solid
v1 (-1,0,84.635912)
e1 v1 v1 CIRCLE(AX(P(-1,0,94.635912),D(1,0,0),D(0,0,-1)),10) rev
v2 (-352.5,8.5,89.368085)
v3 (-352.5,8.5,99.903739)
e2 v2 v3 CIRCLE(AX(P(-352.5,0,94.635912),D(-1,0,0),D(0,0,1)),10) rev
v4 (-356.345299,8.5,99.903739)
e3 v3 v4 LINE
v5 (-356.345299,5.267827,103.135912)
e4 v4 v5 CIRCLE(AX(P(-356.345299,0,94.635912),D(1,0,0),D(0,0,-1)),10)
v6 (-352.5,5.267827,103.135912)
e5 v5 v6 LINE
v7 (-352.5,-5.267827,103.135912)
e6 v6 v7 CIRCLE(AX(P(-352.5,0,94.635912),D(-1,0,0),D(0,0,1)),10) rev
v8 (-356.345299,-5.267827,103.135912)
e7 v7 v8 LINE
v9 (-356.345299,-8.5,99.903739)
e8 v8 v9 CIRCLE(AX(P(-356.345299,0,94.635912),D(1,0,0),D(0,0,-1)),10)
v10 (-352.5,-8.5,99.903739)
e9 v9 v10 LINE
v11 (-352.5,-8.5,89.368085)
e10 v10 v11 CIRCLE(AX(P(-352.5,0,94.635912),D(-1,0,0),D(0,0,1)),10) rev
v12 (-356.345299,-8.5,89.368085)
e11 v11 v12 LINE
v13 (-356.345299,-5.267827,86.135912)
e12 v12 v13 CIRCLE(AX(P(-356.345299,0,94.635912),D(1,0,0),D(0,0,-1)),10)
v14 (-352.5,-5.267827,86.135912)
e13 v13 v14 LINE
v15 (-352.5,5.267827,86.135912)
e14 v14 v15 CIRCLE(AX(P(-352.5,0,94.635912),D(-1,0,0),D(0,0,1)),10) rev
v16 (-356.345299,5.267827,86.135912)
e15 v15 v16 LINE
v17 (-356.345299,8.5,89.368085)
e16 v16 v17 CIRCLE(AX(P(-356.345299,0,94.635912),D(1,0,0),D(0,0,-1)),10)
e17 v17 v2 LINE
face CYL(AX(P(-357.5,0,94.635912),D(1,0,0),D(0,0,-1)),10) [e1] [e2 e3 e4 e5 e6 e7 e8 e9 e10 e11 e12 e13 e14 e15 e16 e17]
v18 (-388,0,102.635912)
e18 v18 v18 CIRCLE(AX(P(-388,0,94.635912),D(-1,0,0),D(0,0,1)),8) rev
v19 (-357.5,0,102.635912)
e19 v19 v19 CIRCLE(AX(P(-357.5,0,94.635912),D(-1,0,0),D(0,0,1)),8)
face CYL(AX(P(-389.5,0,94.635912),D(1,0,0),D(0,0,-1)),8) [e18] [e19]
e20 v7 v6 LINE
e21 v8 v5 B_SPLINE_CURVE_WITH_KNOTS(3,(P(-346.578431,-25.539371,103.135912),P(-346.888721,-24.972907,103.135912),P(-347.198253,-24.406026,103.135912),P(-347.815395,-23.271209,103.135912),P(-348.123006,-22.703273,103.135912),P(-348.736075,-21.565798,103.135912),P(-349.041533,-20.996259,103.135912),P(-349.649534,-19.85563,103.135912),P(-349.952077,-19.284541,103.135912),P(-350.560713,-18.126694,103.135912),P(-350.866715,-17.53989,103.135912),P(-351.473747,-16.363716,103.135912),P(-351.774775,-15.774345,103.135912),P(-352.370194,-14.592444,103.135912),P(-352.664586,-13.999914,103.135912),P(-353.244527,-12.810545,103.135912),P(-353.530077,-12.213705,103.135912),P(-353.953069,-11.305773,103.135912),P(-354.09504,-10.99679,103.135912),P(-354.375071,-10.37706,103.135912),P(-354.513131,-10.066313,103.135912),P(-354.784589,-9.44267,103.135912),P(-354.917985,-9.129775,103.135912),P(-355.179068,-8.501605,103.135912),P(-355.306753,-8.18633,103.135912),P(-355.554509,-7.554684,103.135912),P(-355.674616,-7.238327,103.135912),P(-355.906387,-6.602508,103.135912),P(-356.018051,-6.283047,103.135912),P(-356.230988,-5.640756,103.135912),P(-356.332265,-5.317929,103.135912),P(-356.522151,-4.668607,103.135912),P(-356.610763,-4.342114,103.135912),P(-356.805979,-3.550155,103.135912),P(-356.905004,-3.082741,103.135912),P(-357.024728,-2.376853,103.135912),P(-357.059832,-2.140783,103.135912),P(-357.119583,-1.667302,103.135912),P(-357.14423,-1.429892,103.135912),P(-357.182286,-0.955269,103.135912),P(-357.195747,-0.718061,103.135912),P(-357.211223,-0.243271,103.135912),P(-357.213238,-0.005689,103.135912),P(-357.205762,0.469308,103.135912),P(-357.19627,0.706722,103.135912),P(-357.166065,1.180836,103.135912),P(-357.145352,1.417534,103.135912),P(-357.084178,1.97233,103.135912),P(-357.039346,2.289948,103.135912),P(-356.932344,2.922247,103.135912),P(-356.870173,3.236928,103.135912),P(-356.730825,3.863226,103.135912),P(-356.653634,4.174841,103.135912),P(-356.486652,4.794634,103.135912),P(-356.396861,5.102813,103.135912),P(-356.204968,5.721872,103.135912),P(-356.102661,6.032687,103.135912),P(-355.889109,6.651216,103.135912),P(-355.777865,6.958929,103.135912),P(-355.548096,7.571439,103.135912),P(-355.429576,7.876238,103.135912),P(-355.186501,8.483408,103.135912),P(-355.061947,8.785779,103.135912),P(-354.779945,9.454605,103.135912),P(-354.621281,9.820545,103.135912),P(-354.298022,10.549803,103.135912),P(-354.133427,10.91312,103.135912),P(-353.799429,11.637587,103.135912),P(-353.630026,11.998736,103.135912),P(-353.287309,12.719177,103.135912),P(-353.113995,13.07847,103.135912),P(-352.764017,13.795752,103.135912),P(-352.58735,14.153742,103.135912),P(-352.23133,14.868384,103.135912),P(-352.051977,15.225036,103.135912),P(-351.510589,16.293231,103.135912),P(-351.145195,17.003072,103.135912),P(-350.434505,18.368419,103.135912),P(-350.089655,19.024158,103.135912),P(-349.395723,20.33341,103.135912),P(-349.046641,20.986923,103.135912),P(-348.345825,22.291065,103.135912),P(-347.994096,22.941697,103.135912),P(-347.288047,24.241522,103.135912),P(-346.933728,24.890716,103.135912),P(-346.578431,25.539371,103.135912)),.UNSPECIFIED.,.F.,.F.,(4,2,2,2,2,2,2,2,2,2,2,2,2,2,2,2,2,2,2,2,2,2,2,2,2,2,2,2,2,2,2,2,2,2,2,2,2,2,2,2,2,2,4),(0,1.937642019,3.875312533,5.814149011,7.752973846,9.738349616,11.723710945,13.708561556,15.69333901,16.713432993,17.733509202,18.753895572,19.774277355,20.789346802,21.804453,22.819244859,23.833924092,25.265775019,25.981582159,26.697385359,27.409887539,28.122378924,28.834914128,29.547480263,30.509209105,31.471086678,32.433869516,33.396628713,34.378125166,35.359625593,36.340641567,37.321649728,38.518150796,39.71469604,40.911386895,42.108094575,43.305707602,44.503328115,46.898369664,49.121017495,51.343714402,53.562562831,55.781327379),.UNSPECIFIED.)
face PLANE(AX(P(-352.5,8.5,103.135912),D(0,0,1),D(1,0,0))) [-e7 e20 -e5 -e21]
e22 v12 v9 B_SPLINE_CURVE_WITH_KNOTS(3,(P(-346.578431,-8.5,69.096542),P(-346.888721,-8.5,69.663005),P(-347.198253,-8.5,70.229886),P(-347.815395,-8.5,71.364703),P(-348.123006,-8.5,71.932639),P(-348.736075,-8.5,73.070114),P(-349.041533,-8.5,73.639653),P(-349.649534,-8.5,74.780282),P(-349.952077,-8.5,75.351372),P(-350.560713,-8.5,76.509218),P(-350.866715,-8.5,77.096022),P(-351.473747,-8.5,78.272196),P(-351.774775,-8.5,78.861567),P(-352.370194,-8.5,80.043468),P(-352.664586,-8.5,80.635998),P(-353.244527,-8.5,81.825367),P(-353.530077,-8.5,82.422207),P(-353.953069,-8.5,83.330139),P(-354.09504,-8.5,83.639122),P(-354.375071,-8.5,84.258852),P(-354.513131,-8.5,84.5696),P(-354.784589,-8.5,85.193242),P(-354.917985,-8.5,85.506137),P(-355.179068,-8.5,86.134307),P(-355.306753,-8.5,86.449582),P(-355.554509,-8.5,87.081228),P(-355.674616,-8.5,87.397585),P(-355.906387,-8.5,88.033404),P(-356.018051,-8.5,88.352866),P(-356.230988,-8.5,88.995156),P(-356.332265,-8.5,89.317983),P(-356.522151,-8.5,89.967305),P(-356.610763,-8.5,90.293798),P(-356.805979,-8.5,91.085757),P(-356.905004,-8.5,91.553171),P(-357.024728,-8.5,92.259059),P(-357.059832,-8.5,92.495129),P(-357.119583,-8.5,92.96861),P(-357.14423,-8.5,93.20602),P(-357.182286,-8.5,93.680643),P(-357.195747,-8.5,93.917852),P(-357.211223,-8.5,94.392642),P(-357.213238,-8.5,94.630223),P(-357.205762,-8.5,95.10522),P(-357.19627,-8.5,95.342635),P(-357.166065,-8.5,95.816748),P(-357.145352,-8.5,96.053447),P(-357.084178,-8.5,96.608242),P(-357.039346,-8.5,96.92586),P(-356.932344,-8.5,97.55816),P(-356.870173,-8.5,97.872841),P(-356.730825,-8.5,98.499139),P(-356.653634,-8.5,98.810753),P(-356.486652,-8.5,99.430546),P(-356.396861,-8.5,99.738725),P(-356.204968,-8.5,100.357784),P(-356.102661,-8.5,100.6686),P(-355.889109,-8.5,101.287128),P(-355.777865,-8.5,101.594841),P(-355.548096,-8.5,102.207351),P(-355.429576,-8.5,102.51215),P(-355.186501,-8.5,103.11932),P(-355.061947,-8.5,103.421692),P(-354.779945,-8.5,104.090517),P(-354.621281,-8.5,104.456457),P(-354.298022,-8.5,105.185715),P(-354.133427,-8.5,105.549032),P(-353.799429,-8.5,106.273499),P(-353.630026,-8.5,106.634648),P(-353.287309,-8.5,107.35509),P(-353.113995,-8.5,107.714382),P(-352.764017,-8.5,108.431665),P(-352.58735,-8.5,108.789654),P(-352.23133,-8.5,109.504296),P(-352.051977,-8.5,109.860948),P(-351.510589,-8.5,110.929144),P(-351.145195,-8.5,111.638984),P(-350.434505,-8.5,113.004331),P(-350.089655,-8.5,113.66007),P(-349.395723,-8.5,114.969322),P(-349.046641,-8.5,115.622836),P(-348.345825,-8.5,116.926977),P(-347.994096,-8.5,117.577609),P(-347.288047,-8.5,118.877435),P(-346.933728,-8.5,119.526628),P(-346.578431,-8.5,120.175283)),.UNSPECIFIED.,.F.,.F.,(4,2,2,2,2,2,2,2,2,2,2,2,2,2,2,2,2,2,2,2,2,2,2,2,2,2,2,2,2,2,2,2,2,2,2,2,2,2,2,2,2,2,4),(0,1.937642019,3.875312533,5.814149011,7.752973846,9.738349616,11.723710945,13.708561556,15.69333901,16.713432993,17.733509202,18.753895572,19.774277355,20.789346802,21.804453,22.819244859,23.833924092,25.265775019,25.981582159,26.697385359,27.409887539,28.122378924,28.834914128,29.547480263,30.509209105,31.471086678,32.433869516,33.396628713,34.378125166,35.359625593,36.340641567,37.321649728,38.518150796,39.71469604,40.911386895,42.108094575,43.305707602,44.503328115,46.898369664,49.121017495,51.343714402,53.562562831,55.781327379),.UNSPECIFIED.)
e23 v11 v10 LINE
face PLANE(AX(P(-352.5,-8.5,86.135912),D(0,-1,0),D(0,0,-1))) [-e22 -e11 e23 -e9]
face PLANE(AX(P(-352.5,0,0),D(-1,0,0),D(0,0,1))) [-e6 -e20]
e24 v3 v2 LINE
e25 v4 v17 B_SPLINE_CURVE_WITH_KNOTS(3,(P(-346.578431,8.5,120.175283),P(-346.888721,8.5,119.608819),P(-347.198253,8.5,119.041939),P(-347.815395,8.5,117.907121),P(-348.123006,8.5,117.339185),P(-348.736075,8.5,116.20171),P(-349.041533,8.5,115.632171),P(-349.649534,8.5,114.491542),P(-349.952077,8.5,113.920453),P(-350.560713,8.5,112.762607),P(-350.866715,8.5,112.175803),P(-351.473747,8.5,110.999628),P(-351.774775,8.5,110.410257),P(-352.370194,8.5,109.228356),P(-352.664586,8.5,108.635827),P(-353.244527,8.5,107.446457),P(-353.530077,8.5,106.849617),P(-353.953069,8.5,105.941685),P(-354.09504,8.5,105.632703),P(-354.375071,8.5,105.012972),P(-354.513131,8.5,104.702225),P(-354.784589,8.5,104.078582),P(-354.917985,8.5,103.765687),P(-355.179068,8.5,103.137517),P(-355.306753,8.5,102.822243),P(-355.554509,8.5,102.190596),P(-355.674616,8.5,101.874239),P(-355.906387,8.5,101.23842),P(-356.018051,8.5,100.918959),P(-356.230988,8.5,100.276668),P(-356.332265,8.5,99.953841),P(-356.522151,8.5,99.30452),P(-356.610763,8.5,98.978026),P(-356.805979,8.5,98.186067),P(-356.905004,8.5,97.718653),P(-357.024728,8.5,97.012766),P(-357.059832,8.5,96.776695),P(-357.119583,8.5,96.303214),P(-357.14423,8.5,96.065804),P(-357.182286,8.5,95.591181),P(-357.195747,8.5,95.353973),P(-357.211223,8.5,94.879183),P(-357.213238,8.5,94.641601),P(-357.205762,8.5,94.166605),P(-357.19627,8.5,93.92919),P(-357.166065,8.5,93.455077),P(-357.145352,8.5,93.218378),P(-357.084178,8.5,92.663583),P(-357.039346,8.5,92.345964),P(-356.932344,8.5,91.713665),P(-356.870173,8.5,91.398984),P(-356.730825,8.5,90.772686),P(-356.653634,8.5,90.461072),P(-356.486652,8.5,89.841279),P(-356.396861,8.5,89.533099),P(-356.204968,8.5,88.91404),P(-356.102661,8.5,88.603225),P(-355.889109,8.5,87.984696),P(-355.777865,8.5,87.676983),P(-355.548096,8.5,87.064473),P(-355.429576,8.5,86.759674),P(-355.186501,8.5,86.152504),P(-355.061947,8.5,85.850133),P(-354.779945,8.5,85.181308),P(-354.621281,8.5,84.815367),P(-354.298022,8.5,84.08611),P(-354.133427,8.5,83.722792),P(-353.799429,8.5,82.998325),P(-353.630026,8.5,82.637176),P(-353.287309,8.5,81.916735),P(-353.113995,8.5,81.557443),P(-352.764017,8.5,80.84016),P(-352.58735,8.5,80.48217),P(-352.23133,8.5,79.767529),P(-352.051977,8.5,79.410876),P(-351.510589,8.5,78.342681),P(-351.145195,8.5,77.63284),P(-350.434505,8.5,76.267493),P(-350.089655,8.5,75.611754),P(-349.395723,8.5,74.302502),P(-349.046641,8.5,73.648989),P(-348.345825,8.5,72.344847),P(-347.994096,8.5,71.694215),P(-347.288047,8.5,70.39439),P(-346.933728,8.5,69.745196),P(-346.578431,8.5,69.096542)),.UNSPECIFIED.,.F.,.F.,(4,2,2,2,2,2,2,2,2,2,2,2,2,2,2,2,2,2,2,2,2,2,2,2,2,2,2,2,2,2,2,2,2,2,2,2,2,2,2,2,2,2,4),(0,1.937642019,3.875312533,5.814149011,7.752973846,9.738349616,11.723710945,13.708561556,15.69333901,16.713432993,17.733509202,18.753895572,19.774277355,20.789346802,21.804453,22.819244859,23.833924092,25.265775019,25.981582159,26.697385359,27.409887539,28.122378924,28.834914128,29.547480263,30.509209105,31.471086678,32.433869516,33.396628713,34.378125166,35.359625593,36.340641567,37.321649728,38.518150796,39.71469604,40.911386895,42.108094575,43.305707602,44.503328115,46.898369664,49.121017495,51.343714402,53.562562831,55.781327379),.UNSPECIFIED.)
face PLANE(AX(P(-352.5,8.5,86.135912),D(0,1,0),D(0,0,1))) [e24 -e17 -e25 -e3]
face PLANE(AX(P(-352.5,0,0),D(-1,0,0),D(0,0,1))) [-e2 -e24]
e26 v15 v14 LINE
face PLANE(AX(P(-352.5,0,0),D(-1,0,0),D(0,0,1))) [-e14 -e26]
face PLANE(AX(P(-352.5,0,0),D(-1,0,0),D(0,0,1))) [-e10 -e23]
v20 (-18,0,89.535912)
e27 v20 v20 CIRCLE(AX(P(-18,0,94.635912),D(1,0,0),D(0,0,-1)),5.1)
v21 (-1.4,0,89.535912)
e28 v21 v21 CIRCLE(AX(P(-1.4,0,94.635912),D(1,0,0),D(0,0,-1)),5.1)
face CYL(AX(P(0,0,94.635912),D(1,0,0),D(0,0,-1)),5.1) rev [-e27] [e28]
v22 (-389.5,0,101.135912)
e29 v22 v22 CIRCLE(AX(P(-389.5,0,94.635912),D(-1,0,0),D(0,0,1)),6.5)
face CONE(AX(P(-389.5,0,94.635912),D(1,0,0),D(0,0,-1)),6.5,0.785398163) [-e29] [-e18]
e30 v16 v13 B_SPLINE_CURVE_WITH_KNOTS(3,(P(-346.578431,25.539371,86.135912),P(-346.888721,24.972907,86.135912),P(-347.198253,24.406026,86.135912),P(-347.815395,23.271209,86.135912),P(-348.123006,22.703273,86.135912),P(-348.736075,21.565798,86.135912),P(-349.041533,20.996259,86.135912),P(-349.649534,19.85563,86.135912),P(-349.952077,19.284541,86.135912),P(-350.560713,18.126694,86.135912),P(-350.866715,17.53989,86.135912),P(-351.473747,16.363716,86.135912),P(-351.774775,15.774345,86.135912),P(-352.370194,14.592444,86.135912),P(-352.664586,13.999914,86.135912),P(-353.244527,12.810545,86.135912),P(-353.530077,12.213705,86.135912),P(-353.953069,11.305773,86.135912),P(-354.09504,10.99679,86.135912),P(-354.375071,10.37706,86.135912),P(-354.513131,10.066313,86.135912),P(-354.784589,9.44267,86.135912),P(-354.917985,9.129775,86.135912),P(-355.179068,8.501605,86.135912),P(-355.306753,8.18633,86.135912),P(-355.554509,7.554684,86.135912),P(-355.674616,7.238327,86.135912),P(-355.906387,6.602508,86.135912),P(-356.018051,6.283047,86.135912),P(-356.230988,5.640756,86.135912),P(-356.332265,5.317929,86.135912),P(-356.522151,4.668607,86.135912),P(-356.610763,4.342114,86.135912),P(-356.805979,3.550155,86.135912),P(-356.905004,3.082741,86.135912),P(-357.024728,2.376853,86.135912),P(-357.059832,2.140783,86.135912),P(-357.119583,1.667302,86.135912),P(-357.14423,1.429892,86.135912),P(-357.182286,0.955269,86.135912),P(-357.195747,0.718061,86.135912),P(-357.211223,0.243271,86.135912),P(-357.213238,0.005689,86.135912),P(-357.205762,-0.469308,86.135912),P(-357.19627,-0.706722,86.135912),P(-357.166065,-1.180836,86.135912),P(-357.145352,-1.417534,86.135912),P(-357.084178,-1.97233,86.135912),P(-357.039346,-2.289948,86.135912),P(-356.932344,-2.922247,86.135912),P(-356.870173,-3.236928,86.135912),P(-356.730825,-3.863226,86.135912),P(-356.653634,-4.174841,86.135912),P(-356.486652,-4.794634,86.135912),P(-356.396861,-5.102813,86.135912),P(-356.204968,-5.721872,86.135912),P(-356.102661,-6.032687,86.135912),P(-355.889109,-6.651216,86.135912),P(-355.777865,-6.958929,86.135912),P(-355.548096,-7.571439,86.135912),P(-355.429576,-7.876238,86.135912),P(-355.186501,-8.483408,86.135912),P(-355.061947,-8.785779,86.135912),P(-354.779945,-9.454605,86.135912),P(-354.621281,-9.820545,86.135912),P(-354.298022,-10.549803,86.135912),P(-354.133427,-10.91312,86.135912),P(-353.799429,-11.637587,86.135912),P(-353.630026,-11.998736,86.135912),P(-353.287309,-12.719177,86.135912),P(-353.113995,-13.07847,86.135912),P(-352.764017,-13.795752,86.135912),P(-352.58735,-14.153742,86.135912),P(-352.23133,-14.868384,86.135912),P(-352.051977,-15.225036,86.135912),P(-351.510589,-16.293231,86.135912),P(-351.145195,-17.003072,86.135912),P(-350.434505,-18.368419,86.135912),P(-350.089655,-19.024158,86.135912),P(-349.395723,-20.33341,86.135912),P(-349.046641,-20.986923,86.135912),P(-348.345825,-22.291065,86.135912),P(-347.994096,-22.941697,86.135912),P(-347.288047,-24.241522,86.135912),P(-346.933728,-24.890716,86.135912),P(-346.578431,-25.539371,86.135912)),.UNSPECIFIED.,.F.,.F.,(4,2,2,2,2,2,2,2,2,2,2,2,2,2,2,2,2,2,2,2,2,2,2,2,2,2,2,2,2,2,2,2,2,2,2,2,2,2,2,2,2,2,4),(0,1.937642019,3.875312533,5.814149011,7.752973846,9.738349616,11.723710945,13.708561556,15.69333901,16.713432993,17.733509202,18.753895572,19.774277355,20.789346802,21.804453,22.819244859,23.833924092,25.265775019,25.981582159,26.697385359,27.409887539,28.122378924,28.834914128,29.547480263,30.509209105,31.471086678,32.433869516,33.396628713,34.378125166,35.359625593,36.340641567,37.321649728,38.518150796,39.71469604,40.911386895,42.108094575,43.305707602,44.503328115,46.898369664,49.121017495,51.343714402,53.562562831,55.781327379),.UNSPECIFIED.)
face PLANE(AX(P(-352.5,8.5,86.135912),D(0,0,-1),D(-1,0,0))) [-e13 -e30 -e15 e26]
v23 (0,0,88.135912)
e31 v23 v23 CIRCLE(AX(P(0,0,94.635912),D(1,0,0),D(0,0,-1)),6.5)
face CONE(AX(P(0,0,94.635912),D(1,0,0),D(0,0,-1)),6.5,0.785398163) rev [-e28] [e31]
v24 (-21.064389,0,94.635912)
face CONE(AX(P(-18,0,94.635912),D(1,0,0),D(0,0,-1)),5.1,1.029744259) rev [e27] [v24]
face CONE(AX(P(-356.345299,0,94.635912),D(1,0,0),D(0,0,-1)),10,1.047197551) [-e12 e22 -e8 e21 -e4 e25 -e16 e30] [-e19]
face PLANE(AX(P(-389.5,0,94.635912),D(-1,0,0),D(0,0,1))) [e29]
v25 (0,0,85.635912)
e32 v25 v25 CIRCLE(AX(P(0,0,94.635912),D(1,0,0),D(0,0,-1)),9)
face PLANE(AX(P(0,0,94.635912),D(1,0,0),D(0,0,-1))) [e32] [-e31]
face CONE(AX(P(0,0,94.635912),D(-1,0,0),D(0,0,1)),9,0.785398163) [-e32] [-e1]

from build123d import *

# Parameters (mm, degrees)
SZKIC1_R                          = 10
DODANIE_WYCI_GNI_CIE1_DEPTH       = 357.5
SZKIC2_R                          = 8
DODANIE_WYCI_GNI_CIE2_DEPTH       = 32
SFAZOWANIE1_SIZE                  = 1.5
SFAZOWANIE2_SIZE2                 = 1.154700538
SFAZOWANIE2_SIZE                  = 2
SZKIC3_W                          = 28.491583868
SZKIC3_H                          = 26.39290166
SZKIC3_W_2                        = 17
SZKIC3_H_2                        = 17
WYTNIJ_WYCI_GNI_CIE1_DEPTH        = 5
SFAZOWANIE3_SIZE                  = 1
OTW_R_GWINTOWANY_M121_D           = 10.2
OTW_R_GWINTOWANY_M121_DEPTH       = 18
OTW_R_GWINTOWANY_M121_CSINK_D     = 13
OTW_R_GWINTOWANY_M121_CSINK_ANGLE = 90
OTW_R_GWINTOWANY_M121_TIP         = 3.064389157


with BuildPart() as part:
    # Szkic1 → Dodanie-wyciągnięcie1 (new body)
    with BuildSketch(Plane(origin=(0, 0, 0), x_dir=(0, 0, -1), z_dir=(1, 0, 0))):
        with Locations((-94.635912223, 0)):
            Circle(SZKIC1_R)
    extrude(amount=-DODANIE_WYCI_GNI_CIE1_DEPTH)

    # Szkic2 → Dodanie-wyciągnięcie2 (add)
    with BuildSketch(Plane.ZY.offset(357.5)):
        with Locations((94.635912223, 0)):
            Circle(SZKIC2_R)
    extrude(amount=DODANIE_WYCI_GNI_CIE2_DEPTH)

    # Sfazowanie1
    sfazowanie1_edges = [part.edges().sort_by_distance(p)[0] for p in [
        (-389.5, 0, 86.635912223),
    ]]
    chamfer(sfazowanie1_edges, length=SFAZOWANIE1_SIZE)

    # Sfazowanie2
    sfazowanie2_edges = [part.edges().sort_by_distance(p)[0] for p in [
        (-357.5, 0, 104.635912223),
    ]]
    sfazowanie2_side = [part.faces().sort_by_distance(p)[0] for p in [
        (-357.5, 0, 104.612818213),
    ]]
    chamfer(sfazowanie2_edges, length=SFAZOWANIE2_SIZE - 0.0001, length2=SFAZOWANIE2_SIZE2 - 0.0001, reference=sfazowanie2_side[0])  # a hair under: the kernel refuses the full size

    # Szkic3 → Wytnij-wyciągnięcie1 (cut)
    with BuildSketch(Plane.ZY.offset(357.5)):
        with Locations((94.635912223, 0)):
            Rectangle(SZKIC3_W, SZKIC3_H)
        with Locations((94.635912223, 0)):
            Rectangle(SZKIC3_W_2, SZKIC3_H_2, mode=Mode.SUBTRACT)
    extrude(amount=-WYTNIJ_WYCI_GNI_CIE1_DEPTH, mode=Mode.SUBTRACT)

    # Sfazowanie3
    sfazowanie3_edges = [part.edges().sort_by_distance(p)[0] for p in [
        (0, 0, 104.635912223),
    ]]
    chamfer(sfazowanie3_edges, length=SFAZOWANIE3_SIZE)

    # Otwór gwintowany M121
    with Locations(Plane(origin=(0, 0, 0), x_dir=(0, 0, -1), z_dir=(1, 0, 0))):
        with Locations((-94.635912223, 0)):
            CounterSinkHole(OTW_R_GWINTOWANY_M121_D / 2, OTW_R_GWINTOWANY_M121_CSINK_D / 2, depth=OTW_R_GWINTOWANY_M121_DEPTH, counter_sink_angle=OTW_R_GWINTOWANY_M121_CSINK_ANGLE)
            with Locations((0, 0, -(OTW_R_GWINTOWANY_M121_DEPTH + OTW_R_GWINTOWANY_M121_TIP / 2))):  # 118° drill point
                Cone(0, OTW_R_GWINTOWANY_M121_D / 2, OTW_R_GWINTOWANY_M121_TIP, mode=Mode.SUBTRACT)


solid = part.part
